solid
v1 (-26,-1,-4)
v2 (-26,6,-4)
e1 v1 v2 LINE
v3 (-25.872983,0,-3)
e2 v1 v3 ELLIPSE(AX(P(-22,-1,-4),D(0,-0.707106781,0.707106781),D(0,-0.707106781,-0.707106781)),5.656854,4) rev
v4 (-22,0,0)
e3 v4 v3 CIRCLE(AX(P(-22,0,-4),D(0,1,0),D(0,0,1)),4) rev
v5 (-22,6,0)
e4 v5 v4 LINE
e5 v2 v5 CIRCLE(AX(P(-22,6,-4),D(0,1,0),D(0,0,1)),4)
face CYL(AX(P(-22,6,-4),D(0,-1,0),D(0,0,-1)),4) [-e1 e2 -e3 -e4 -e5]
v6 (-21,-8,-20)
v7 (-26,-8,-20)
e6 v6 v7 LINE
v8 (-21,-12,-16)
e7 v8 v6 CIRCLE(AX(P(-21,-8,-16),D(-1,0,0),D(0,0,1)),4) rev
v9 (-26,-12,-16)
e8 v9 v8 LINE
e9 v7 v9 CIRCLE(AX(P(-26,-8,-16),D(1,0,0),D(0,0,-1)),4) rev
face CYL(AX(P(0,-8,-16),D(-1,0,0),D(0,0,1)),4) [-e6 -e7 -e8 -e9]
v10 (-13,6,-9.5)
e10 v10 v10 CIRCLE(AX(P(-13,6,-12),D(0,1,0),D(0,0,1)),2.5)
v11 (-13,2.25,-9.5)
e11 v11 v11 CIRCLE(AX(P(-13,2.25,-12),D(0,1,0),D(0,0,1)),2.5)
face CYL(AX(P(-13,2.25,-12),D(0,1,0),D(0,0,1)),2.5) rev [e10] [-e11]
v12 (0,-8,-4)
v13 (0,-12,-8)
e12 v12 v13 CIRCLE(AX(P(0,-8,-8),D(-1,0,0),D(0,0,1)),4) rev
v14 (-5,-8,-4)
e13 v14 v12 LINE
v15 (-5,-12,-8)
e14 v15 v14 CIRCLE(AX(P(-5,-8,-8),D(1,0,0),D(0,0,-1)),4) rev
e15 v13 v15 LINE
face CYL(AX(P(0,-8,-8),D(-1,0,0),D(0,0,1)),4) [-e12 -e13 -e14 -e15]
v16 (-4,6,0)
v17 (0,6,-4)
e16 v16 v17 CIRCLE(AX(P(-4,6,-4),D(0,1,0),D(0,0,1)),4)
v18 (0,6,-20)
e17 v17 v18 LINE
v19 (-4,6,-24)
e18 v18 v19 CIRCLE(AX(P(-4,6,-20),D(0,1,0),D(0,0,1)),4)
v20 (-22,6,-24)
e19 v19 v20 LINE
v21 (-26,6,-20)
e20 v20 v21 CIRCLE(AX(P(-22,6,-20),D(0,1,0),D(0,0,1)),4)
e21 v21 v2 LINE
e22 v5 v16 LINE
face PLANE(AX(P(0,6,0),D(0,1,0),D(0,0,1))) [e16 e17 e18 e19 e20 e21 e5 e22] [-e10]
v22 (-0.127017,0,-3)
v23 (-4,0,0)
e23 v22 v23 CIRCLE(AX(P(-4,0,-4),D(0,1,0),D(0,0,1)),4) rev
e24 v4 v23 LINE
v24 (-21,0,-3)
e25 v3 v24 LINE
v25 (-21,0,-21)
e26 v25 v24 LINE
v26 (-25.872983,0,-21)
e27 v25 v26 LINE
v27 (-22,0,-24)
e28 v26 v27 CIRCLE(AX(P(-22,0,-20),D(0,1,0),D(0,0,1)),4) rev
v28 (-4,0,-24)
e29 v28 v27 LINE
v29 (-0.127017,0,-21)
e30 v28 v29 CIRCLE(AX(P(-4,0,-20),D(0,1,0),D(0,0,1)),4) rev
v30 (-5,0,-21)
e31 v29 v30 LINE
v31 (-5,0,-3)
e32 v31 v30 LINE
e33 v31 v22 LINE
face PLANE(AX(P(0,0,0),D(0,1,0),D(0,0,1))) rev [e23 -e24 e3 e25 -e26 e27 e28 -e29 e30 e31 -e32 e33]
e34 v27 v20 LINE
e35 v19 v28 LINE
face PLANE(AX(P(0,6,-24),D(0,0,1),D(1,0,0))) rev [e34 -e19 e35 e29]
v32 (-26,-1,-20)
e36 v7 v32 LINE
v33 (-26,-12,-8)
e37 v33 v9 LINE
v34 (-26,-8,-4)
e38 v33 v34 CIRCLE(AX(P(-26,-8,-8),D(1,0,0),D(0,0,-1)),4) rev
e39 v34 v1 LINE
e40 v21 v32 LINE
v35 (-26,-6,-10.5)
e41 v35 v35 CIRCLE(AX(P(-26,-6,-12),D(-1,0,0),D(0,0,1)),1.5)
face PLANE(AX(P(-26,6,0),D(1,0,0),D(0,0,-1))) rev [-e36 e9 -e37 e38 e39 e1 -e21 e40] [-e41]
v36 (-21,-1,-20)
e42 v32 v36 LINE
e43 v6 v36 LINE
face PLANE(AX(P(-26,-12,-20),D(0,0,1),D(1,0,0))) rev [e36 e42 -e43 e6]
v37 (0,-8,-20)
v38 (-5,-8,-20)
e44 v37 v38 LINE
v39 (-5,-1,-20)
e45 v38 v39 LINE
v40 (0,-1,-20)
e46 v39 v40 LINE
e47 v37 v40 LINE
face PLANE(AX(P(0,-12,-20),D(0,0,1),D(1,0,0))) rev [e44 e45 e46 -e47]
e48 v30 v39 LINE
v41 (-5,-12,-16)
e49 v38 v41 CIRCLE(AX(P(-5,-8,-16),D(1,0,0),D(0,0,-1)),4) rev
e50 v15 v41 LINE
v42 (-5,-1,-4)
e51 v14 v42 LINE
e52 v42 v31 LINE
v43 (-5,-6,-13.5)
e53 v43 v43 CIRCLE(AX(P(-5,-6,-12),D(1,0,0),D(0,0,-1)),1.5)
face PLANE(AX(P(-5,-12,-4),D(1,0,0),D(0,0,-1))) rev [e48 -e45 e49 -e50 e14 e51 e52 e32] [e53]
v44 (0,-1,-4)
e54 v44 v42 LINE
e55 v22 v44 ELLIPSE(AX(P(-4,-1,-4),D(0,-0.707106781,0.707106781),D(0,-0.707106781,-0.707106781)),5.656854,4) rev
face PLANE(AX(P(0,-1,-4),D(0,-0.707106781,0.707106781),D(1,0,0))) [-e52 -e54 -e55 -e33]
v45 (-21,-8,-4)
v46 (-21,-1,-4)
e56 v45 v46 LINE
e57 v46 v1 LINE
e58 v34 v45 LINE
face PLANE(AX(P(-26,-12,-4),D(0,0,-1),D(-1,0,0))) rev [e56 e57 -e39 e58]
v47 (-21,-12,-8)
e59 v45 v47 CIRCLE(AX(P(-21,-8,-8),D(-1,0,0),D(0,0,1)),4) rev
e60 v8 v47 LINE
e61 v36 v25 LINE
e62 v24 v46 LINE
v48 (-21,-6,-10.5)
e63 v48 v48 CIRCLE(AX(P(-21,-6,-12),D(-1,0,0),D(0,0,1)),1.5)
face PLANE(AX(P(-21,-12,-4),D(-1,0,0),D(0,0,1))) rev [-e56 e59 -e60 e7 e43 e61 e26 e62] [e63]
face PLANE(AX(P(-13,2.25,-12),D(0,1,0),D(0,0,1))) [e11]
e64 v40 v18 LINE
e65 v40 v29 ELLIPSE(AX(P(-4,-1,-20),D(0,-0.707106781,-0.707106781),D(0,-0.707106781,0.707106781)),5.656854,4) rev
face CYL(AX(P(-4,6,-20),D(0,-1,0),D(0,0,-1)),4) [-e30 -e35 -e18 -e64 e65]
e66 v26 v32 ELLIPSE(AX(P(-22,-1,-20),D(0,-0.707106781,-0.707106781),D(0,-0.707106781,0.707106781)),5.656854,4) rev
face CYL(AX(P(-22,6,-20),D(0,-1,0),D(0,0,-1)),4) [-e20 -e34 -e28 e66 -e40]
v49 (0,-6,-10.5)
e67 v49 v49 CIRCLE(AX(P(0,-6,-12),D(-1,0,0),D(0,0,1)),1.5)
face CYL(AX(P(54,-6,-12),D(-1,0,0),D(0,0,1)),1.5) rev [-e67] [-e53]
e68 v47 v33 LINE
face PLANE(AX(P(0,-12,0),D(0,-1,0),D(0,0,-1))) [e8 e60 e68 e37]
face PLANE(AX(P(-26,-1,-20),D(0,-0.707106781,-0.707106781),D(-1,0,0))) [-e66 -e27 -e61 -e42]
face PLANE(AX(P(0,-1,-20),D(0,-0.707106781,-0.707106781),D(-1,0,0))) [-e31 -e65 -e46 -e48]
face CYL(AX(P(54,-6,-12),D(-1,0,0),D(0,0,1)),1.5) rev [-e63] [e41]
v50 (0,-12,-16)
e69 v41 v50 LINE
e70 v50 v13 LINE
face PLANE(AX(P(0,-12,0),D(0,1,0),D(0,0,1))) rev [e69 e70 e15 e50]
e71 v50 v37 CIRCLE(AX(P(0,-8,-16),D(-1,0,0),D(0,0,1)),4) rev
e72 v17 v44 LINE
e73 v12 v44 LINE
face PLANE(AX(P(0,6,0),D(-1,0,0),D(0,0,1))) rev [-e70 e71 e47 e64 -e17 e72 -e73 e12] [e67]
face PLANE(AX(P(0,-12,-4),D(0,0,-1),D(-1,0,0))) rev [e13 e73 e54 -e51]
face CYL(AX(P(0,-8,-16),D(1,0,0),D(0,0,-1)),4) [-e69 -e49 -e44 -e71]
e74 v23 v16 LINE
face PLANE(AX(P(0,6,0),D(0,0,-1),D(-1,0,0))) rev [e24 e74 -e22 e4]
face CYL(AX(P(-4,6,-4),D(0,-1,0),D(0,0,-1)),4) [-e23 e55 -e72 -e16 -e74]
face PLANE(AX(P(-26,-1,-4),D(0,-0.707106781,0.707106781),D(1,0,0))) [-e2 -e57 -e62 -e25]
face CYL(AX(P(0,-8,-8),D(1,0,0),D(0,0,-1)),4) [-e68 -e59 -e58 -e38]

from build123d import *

# Parameters (mm, degrees)
SKETCH_1_W          = 26
SKETCH_1_H          = 24
EXTRUDE_1_DEPTH     = 6
SKETCH_2_W          = 5
SKETCH_2_H          = 16
EXTRUDE_2_DEPTH     = 12
SKETCH_3_R          = 1.5
CUT_EXTRUDE_1_DEPTH = 80
SKETCH_4_R          = 2.5
CUT_EXTRUDE_2_DEPTH = 3.75
FILLET_1_R          = 4
FILLET_2_R          = 4
CHAMFER_1_SIZE      = 1


with BuildPart() as part:
    # 草图1 → 凸台-拉伸1 (new body)
    with BuildSketch(Plane(origin=(0, 0, 0), x_dir=(1, 0, 0), z_dir=(0, 1, 0))):
        with Locations((-13, 12)):
            Rectangle(SKETCH_1_W, SKETCH_1_H)
    extrude(amount=EXTRUDE_1_DEPTH)

    # 草图2 → 凸台-拉伸2 (add)
    with BuildSketch(Plane.XZ):
        with Locations((-23.5, -12)):
            Rectangle(SKETCH_2_W, SKETCH_2_H)
        with Locations((-2.5, -12)):
            Rectangle(SKETCH_2_W, SKETCH_2_H)
    extrude(amount=EXTRUDE_2_DEPTH)

    # 草图3 → 切除-拉伸1 (cut)
    with BuildSketch(Plane.ZY.offset(26)):
        with Locations((-12, -6)):
            Circle(SKETCH_3_R)
    extrude(amount=-CUT_EXTRUDE_1_DEPTH, mode=Mode.SUBTRACT)

    # 草图4 → 切除-拉伸2 (cut)
    with BuildSketch(Plane(origin=(0, 6, 0), x_dir=(1, 0, 0), z_dir=(0, 1, 0))):
        with Locations(Location((-13, 12, 0), (0, 0, 270))):
            Circle(SKETCH_4_R)
    extrude(amount=-CUT_EXTRUDE_2_DEPTH, mode=Mode.SUBTRACT)

    # 圆角1
    fillet_1_edges = [part.edges().sort_by_distance(p)[0] for p in [
        (-26, 3, -24),
        (0, 3, -24),
        (0, 3, 0),
        (-26, 3, 0),
    ]]
    fillet(fillet_1_edges, radius=FILLET_1_R)

    # 圆角2
    fillet_2_edges = [part.edges().sort_by_distance(p)[0] for p in [
        (-23.5, -12, -20),
        (-23.5, -12, -4),
        (-2.5, -12, -4),
        (-2.5, -12, -20),
    ]]
    fillet(fillet_2_edges, radius=FILLET_2_R)

    # 倒角1
    # the kernel refuses this chamfer: 1 mm, written as the material it adds along each edge
    with BuildSketch(Plane(origin=(-21, 0, -20), x_dir=(0, -0.9996219169112968, 0.02749587661058563), z_dir=(-1, 0, 0))) as chamfer_1_piece_1_section:
        Polygon((CHAMFER_1_SIZE * 0.999621916911, -CHAMFER_1_SIZE * 0.0274958766106), (-CHAMFER_1_SIZE * 0.0274958766106, -CHAMFER_1_SIZE * 0.999621916911), (0, 0), align=None)
    chamfer_1_piece_1 = extrude(amount=7.571682988, mode=Mode.PRIVATE)
    chamfer_1_piece_1 = chamfer_1_piece_1 & Plane(origin=(-22, -0.333896309, -20), x_dir=(-1, 0, 0), z_dir=(0, 1, 0)) * Cylinder(4, 20, mode=Mode.PRIVATE)
    add(chamfer_1_piece_1)
    with BuildSketch(Plane(origin=(-28.571682988, 0, -4), x_dir=(0, 0.02749587661058636, 0.9996219169112968), z_dir=(1, 0, 0))) as chamfer_1_piece_2_section:
        Polygon((CHAMFER_1_SIZE * 0.999621916911, CHAMFER_1_SIZE * 0.0274958766106), (-CHAMFER_1_SIZE * 0.0274958766106, CHAMFER_1_SIZE * 0.999621916911), (0, 0), align=None)
    chamfer_1_piece_2 = extrude(amount=7.571682988, mode=Mode.PRIVATE)
    chamfer_1_piece_2 = chamfer_1_piece_2 & Plane(origin=(-22, -0.333896309, -4), x_dir=(0, 0, 1), z_dir=(0, 1, 0)) * Cylinder(4, 20, mode=Mode.PRIVATE)
    add(chamfer_1_piece_2)
    with BuildSketch(Plane(origin=(2.571682988, 0, -4), x_dir=(0, 0.02749587661058636, 0.9996219169112968), z_dir=(-1, 0, 0))) as chamfer_1_piece_3_section:
        Polygon((CHAMFER_1_SIZE * 0.999621916911, -CHAMFER_1_SIZE * 0.0274958766106), (-CHAMFER_1_SIZE * 0.0274958766106, -CHAMFER_1_SIZE * 0.999621916911), (0, 0), align=None)
    chamfer_1_piece_3 = extrude(amount=7.571682988, mode=Mode.PRIVATE)
    chamfer_1_piece_3 = chamfer_1_piece_3 & Plane(origin=(-4, -0.333896309, -4), x_dir=(0, 0, 1), z_dir=(0, 1, 0)) * Cylinder(4, 20, mode=Mode.PRIVATE)
    add(chamfer_1_piece_3)
    with BuildSketch(Plane(origin=(-5, 0, -20), x_dir=(0, 0.02749587661058639, -0.9996219169112968), z_dir=(1, 0, 0))) as chamfer_1_piece_4_section:
        Polygon((CHAMFER_1_SIZE * 0.999621916911, -CHAMFER_1_SIZE * 0.0274958766106), (-CHAMFER_1_SIZE * 0.0274958766106, -CHAMFER_1_SIZE * 0.999621916911), (0, 0), align=None)
    chamfer_1_piece_4 = extrude(amount=7.571682988, mode=Mode.PRIVATE)
    chamfer_1_piece_4 = chamfer_1_piece_4 & Plane(origin=(-4, -0.333896309, -20), x_dir=(1, 0, 0), z_dir=(0, 1, 0)) * Cylinder(4, 20, mode=Mode.PRIVATE)
    add(chamfer_1_piece_4)


solid = part.part
